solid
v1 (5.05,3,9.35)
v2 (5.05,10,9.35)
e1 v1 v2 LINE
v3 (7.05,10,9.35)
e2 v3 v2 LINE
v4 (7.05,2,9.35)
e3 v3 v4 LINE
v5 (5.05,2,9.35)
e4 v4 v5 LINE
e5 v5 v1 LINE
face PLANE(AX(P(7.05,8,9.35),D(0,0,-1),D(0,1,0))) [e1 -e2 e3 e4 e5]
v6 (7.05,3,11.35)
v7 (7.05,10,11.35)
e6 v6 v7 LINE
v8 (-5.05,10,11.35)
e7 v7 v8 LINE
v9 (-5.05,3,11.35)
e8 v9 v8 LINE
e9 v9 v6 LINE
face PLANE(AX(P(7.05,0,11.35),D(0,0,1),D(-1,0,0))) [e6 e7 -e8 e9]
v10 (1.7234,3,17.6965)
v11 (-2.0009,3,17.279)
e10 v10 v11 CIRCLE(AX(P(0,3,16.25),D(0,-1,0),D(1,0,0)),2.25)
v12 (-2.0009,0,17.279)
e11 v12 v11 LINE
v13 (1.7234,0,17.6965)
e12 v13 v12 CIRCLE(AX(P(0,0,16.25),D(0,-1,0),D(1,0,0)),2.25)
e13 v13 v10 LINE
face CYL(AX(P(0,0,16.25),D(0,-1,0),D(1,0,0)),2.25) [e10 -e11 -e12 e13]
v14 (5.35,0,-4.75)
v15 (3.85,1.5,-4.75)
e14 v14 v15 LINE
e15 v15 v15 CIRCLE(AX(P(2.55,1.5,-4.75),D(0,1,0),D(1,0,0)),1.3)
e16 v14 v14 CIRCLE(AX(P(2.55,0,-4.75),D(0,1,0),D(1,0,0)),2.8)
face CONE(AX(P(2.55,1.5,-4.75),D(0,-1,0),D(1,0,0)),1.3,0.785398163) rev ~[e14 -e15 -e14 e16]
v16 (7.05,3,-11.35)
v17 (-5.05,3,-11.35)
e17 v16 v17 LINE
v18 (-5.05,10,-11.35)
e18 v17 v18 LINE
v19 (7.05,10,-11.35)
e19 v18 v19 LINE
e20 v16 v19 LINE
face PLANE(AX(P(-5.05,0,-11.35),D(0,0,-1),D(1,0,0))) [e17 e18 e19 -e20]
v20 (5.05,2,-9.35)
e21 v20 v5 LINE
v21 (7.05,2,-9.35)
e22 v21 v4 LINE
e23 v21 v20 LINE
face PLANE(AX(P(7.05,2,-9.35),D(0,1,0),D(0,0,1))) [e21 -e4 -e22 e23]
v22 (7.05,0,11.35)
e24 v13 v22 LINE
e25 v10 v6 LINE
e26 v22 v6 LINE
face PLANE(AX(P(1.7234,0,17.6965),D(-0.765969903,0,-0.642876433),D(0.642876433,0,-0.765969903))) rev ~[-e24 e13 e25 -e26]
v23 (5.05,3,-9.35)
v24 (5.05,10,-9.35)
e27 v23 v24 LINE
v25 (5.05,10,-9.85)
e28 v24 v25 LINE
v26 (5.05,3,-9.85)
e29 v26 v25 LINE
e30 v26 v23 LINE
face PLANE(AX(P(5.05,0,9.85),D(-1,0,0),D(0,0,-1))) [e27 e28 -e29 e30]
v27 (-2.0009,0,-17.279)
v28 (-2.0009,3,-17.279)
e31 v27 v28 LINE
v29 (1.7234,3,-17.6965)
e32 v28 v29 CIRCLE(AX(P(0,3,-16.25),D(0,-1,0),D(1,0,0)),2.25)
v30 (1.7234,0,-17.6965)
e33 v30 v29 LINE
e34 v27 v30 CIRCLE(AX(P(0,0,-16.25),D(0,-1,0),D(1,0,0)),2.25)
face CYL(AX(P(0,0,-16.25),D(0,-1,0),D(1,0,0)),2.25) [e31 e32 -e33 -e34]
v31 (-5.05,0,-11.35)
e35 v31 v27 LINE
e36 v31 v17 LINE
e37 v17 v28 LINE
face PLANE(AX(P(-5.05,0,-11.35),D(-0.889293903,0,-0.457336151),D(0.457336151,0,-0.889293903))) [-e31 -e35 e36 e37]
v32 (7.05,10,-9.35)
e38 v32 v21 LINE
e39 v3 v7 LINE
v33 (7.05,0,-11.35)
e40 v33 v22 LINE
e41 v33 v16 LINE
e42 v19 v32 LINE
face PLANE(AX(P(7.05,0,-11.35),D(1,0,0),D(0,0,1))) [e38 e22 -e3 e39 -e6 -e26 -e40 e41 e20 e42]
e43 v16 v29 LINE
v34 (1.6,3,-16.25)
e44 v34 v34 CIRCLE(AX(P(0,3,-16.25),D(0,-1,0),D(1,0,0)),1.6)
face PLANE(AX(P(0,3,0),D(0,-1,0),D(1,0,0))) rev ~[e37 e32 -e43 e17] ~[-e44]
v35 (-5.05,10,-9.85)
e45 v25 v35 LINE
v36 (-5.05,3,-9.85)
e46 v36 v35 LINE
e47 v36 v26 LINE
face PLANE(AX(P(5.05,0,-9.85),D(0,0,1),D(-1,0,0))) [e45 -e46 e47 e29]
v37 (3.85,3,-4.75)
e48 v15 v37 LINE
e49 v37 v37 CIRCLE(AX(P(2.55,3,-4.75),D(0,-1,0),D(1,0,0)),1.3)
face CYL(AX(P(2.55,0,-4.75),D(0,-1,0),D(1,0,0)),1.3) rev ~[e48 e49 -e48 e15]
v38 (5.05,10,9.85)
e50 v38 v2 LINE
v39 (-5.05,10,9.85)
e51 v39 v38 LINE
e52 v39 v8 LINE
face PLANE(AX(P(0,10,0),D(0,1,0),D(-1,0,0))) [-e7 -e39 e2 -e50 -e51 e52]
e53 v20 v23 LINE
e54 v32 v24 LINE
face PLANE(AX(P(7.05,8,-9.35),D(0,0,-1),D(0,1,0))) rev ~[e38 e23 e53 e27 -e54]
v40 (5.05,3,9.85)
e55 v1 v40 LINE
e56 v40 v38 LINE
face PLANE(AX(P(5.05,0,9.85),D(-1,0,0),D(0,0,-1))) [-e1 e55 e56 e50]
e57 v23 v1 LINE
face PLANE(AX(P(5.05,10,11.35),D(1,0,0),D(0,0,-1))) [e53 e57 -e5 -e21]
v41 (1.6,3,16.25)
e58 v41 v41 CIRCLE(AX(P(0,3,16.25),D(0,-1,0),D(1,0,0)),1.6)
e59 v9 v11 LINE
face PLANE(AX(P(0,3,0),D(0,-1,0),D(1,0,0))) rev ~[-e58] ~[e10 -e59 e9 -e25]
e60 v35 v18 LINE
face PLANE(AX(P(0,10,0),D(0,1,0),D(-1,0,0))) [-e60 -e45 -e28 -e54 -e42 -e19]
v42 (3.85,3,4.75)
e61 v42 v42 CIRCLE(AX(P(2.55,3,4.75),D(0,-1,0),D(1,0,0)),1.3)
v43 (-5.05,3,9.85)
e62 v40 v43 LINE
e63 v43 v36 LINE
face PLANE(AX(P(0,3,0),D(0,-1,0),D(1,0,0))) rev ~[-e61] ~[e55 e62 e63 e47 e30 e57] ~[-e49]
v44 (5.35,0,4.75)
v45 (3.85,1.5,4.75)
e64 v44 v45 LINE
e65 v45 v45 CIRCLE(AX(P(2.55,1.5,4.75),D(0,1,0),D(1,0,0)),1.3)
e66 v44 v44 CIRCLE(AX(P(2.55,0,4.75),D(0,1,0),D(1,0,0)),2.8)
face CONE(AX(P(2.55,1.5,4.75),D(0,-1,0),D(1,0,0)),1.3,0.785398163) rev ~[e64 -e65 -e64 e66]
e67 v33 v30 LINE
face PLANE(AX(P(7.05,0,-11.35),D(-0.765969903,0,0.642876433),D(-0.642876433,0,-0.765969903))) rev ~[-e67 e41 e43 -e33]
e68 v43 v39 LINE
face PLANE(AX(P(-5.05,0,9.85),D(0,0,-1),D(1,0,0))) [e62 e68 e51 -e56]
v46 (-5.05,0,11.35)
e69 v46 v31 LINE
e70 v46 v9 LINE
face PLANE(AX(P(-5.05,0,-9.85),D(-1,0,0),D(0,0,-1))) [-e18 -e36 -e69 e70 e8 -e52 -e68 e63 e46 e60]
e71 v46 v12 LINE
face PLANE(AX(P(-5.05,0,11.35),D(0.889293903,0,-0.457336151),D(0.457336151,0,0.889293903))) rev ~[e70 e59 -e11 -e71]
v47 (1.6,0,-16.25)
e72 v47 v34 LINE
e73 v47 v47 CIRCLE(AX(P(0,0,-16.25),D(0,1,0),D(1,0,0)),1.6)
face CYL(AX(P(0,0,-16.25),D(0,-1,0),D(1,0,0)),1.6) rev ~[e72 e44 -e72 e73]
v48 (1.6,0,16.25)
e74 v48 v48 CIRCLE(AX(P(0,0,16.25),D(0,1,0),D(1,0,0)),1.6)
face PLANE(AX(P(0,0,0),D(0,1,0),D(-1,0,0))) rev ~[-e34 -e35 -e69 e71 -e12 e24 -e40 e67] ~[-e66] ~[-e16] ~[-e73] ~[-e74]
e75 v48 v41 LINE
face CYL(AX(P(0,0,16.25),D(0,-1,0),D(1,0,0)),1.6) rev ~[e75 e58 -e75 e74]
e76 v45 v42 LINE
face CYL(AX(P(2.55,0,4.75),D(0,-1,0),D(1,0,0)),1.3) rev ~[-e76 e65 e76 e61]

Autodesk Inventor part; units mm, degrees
ref_plane "YZ Plane" through (0, 0, 0) normal (1, 0, 0) x (0, 1, 0)
ref_plane "XZ Plane" through (0, 0, 0) normal (0, 1, 0) x (-1, 0, 0)
ref_plane "XY Plane" through (0, 0, 0) normal (0, 0, 1) x (1, 0, 0)
sketch "Эскиз1" plane through (0, 0, 0) normal (0, 1, 0) x (-1, 0, 0)
  line L0 (5.05, 9.85) -> (-5.05, 9.85)
  line L1 (-5.05, 9.85) -> (-5.05, -9.85)
  line L2 (-5.05, -9.85) -> (5.05, -9.85)
  line L3 (5.05, -9.85) -> (5.05, 9.85)
  line L4 (5.05, 9.85) -> (-5.05, -9.85) construction
  line L5 (-5.05, 9.85) -> (5.05, -9.85) construction
  line L6 (7.05, -11.35) -> (5.05, -11.35) construction
  line L7 (-7.05, -11.35) -> (-7.05, 11.35)
  line L8 (-7.05, 11.35) -> (5.05, 11.35)
  line L9 (7.05, 11.35) -> (7.05, -11.35) construction
  line L10 (5.05, 9.85) -> (5.05, 11.35)
  line L11 (5.05, -9.85) -> (5.05, -11.35)
  line L12 (5.05, 11.35) -> (7.05, 11.35) construction
  line L13 (5.05, -11.35) -> (-7.05, -11.35)
  point P0 (0, 0)
  dimension "d0" = 10.1
  dimension "d1" = 19.7
  dimension "d2" = 1.5
  dimension "d24" = 1.5
extrude "Выдавливание1" add sketch "Эскиз1" along normal blind 10 contours L0 L1 L2 L11 L13 L7 L8 L10
sketch "Эскиз2" plane through (0, 0, 0) normal (0, -1, 0) x (1, 0, 0)
  line L0 (-5.05, 11.35) -> (7.05, 11.35) projected
  line L1 (7.05, 11.35) -> (-5.05, 11.35)
  line L2 (-5.05, 11.35) -> (-5.05, -11.35)
  line L3 (-5.05, -11.35) -> (7.05, -11.35)
  line L4 (7.05, -11.35) -> (7.05, 11.35)
  line L5 (0, 16.25) -> (0, -16.25)
  circle A0 centre (0, 16.25) radius 2.25
  circle A1 centre (0, -16.25) radius 2.25
  line L6 (1.7234, 17.6965) -> (7.05, 11.35)
  line L7 (-5.05, 11.35) -> (-2.0009, 17.279)
  line L8 (7.05, -11.35) -> (-5.05, -11.35) projected
  line L9 (7.05, -11.35) -> (1.7234, -17.6965)
  line L10 (-5.05, -11.35) -> (-2.0009, -17.279)
  circle A2 centre (0, 16.25) radius 1.6
  circle A3 centre (0, -16.25) radius 1.6
  circle A4 centre (2.55, -4.75) radius 1.3
  circle A5 centre (2.55, 4.75) radius 1.3
  line L11 (5.05, -9.85) -> (5.05, 9.85) projected
  line L12 (2.55, -4.75) -> (2.55, 4.75)
  line L13 (0, 0) -> (7.05, 0)
  line L14 (7.05, 11.35) -> (7.05, -11.35) projected
  point P0 (-5.05, 11.35)
  point P1 (2.55, 0)
  point P2 (-5.05, 11.35)
  dimension "d5" = 32.5
  dimension "d6" = 4.5
  dimension "d10" = 4.5
  dimension "d12" = 3.2
  dimension "d13" = 3.2
  dimension "d16" = 2.6
  dimension "d17" = 2.6
  dimension "d18" = 2.5
  dimension "d19" = 2.5
  dimension "d20" = 9.5
extrude "Выдавливание2" add sketch "Эскиз2" against normal blind 3
chamfer "Фаска1" distance 1.5 angle 45 2 edges at (1.25, 0, -4.75) (1.25, 0, 4.75)
sketch "Эскиз3" plane through (7.05, 10, 11.35) normal (1, 0, 0) x (0, 0, -1)
  line L0 (22.7, -7) -> (22.7, 0) projected
  line L1 (0, 0) -> (22.7, 0) projected
  line L2 (0, -7) -> (0, 0) projected
  line L3 (0, -10) -> (0, -7) projected
  line L4 (0, -10) -> (22.7, -10) projected
  line L5 (22.7, -10) -> (22.7, -7) projected
  line L6 (20.7, -2) -> (20.7, -7)
  line L7 (20.7, -7) -> (20.7, -8)
  line L8 (20.7, -8) -> (2, -8)
  line L9 (2, -8) -> (2, -7)
  line L10 (2, -7) -> (2, -2)
  line L11 (2, -2) -> (20.7, -2)
  line L12 (20.7, -2) -> (20.7, 0)
  line L13 (0, 0) -> (22.7, 0) projected
  line L14 (2, -2) -> (2, 0)
  point P0 (11.35, -10)
  dimension "d25" = 2
extrude "Выдавливание3" cut sketch "Эскиз3" against normal blind 2 contours L12 L11 L14 L1 | L6 L7 L8 L9 L10 L11
properties part number "креп_концевика"
